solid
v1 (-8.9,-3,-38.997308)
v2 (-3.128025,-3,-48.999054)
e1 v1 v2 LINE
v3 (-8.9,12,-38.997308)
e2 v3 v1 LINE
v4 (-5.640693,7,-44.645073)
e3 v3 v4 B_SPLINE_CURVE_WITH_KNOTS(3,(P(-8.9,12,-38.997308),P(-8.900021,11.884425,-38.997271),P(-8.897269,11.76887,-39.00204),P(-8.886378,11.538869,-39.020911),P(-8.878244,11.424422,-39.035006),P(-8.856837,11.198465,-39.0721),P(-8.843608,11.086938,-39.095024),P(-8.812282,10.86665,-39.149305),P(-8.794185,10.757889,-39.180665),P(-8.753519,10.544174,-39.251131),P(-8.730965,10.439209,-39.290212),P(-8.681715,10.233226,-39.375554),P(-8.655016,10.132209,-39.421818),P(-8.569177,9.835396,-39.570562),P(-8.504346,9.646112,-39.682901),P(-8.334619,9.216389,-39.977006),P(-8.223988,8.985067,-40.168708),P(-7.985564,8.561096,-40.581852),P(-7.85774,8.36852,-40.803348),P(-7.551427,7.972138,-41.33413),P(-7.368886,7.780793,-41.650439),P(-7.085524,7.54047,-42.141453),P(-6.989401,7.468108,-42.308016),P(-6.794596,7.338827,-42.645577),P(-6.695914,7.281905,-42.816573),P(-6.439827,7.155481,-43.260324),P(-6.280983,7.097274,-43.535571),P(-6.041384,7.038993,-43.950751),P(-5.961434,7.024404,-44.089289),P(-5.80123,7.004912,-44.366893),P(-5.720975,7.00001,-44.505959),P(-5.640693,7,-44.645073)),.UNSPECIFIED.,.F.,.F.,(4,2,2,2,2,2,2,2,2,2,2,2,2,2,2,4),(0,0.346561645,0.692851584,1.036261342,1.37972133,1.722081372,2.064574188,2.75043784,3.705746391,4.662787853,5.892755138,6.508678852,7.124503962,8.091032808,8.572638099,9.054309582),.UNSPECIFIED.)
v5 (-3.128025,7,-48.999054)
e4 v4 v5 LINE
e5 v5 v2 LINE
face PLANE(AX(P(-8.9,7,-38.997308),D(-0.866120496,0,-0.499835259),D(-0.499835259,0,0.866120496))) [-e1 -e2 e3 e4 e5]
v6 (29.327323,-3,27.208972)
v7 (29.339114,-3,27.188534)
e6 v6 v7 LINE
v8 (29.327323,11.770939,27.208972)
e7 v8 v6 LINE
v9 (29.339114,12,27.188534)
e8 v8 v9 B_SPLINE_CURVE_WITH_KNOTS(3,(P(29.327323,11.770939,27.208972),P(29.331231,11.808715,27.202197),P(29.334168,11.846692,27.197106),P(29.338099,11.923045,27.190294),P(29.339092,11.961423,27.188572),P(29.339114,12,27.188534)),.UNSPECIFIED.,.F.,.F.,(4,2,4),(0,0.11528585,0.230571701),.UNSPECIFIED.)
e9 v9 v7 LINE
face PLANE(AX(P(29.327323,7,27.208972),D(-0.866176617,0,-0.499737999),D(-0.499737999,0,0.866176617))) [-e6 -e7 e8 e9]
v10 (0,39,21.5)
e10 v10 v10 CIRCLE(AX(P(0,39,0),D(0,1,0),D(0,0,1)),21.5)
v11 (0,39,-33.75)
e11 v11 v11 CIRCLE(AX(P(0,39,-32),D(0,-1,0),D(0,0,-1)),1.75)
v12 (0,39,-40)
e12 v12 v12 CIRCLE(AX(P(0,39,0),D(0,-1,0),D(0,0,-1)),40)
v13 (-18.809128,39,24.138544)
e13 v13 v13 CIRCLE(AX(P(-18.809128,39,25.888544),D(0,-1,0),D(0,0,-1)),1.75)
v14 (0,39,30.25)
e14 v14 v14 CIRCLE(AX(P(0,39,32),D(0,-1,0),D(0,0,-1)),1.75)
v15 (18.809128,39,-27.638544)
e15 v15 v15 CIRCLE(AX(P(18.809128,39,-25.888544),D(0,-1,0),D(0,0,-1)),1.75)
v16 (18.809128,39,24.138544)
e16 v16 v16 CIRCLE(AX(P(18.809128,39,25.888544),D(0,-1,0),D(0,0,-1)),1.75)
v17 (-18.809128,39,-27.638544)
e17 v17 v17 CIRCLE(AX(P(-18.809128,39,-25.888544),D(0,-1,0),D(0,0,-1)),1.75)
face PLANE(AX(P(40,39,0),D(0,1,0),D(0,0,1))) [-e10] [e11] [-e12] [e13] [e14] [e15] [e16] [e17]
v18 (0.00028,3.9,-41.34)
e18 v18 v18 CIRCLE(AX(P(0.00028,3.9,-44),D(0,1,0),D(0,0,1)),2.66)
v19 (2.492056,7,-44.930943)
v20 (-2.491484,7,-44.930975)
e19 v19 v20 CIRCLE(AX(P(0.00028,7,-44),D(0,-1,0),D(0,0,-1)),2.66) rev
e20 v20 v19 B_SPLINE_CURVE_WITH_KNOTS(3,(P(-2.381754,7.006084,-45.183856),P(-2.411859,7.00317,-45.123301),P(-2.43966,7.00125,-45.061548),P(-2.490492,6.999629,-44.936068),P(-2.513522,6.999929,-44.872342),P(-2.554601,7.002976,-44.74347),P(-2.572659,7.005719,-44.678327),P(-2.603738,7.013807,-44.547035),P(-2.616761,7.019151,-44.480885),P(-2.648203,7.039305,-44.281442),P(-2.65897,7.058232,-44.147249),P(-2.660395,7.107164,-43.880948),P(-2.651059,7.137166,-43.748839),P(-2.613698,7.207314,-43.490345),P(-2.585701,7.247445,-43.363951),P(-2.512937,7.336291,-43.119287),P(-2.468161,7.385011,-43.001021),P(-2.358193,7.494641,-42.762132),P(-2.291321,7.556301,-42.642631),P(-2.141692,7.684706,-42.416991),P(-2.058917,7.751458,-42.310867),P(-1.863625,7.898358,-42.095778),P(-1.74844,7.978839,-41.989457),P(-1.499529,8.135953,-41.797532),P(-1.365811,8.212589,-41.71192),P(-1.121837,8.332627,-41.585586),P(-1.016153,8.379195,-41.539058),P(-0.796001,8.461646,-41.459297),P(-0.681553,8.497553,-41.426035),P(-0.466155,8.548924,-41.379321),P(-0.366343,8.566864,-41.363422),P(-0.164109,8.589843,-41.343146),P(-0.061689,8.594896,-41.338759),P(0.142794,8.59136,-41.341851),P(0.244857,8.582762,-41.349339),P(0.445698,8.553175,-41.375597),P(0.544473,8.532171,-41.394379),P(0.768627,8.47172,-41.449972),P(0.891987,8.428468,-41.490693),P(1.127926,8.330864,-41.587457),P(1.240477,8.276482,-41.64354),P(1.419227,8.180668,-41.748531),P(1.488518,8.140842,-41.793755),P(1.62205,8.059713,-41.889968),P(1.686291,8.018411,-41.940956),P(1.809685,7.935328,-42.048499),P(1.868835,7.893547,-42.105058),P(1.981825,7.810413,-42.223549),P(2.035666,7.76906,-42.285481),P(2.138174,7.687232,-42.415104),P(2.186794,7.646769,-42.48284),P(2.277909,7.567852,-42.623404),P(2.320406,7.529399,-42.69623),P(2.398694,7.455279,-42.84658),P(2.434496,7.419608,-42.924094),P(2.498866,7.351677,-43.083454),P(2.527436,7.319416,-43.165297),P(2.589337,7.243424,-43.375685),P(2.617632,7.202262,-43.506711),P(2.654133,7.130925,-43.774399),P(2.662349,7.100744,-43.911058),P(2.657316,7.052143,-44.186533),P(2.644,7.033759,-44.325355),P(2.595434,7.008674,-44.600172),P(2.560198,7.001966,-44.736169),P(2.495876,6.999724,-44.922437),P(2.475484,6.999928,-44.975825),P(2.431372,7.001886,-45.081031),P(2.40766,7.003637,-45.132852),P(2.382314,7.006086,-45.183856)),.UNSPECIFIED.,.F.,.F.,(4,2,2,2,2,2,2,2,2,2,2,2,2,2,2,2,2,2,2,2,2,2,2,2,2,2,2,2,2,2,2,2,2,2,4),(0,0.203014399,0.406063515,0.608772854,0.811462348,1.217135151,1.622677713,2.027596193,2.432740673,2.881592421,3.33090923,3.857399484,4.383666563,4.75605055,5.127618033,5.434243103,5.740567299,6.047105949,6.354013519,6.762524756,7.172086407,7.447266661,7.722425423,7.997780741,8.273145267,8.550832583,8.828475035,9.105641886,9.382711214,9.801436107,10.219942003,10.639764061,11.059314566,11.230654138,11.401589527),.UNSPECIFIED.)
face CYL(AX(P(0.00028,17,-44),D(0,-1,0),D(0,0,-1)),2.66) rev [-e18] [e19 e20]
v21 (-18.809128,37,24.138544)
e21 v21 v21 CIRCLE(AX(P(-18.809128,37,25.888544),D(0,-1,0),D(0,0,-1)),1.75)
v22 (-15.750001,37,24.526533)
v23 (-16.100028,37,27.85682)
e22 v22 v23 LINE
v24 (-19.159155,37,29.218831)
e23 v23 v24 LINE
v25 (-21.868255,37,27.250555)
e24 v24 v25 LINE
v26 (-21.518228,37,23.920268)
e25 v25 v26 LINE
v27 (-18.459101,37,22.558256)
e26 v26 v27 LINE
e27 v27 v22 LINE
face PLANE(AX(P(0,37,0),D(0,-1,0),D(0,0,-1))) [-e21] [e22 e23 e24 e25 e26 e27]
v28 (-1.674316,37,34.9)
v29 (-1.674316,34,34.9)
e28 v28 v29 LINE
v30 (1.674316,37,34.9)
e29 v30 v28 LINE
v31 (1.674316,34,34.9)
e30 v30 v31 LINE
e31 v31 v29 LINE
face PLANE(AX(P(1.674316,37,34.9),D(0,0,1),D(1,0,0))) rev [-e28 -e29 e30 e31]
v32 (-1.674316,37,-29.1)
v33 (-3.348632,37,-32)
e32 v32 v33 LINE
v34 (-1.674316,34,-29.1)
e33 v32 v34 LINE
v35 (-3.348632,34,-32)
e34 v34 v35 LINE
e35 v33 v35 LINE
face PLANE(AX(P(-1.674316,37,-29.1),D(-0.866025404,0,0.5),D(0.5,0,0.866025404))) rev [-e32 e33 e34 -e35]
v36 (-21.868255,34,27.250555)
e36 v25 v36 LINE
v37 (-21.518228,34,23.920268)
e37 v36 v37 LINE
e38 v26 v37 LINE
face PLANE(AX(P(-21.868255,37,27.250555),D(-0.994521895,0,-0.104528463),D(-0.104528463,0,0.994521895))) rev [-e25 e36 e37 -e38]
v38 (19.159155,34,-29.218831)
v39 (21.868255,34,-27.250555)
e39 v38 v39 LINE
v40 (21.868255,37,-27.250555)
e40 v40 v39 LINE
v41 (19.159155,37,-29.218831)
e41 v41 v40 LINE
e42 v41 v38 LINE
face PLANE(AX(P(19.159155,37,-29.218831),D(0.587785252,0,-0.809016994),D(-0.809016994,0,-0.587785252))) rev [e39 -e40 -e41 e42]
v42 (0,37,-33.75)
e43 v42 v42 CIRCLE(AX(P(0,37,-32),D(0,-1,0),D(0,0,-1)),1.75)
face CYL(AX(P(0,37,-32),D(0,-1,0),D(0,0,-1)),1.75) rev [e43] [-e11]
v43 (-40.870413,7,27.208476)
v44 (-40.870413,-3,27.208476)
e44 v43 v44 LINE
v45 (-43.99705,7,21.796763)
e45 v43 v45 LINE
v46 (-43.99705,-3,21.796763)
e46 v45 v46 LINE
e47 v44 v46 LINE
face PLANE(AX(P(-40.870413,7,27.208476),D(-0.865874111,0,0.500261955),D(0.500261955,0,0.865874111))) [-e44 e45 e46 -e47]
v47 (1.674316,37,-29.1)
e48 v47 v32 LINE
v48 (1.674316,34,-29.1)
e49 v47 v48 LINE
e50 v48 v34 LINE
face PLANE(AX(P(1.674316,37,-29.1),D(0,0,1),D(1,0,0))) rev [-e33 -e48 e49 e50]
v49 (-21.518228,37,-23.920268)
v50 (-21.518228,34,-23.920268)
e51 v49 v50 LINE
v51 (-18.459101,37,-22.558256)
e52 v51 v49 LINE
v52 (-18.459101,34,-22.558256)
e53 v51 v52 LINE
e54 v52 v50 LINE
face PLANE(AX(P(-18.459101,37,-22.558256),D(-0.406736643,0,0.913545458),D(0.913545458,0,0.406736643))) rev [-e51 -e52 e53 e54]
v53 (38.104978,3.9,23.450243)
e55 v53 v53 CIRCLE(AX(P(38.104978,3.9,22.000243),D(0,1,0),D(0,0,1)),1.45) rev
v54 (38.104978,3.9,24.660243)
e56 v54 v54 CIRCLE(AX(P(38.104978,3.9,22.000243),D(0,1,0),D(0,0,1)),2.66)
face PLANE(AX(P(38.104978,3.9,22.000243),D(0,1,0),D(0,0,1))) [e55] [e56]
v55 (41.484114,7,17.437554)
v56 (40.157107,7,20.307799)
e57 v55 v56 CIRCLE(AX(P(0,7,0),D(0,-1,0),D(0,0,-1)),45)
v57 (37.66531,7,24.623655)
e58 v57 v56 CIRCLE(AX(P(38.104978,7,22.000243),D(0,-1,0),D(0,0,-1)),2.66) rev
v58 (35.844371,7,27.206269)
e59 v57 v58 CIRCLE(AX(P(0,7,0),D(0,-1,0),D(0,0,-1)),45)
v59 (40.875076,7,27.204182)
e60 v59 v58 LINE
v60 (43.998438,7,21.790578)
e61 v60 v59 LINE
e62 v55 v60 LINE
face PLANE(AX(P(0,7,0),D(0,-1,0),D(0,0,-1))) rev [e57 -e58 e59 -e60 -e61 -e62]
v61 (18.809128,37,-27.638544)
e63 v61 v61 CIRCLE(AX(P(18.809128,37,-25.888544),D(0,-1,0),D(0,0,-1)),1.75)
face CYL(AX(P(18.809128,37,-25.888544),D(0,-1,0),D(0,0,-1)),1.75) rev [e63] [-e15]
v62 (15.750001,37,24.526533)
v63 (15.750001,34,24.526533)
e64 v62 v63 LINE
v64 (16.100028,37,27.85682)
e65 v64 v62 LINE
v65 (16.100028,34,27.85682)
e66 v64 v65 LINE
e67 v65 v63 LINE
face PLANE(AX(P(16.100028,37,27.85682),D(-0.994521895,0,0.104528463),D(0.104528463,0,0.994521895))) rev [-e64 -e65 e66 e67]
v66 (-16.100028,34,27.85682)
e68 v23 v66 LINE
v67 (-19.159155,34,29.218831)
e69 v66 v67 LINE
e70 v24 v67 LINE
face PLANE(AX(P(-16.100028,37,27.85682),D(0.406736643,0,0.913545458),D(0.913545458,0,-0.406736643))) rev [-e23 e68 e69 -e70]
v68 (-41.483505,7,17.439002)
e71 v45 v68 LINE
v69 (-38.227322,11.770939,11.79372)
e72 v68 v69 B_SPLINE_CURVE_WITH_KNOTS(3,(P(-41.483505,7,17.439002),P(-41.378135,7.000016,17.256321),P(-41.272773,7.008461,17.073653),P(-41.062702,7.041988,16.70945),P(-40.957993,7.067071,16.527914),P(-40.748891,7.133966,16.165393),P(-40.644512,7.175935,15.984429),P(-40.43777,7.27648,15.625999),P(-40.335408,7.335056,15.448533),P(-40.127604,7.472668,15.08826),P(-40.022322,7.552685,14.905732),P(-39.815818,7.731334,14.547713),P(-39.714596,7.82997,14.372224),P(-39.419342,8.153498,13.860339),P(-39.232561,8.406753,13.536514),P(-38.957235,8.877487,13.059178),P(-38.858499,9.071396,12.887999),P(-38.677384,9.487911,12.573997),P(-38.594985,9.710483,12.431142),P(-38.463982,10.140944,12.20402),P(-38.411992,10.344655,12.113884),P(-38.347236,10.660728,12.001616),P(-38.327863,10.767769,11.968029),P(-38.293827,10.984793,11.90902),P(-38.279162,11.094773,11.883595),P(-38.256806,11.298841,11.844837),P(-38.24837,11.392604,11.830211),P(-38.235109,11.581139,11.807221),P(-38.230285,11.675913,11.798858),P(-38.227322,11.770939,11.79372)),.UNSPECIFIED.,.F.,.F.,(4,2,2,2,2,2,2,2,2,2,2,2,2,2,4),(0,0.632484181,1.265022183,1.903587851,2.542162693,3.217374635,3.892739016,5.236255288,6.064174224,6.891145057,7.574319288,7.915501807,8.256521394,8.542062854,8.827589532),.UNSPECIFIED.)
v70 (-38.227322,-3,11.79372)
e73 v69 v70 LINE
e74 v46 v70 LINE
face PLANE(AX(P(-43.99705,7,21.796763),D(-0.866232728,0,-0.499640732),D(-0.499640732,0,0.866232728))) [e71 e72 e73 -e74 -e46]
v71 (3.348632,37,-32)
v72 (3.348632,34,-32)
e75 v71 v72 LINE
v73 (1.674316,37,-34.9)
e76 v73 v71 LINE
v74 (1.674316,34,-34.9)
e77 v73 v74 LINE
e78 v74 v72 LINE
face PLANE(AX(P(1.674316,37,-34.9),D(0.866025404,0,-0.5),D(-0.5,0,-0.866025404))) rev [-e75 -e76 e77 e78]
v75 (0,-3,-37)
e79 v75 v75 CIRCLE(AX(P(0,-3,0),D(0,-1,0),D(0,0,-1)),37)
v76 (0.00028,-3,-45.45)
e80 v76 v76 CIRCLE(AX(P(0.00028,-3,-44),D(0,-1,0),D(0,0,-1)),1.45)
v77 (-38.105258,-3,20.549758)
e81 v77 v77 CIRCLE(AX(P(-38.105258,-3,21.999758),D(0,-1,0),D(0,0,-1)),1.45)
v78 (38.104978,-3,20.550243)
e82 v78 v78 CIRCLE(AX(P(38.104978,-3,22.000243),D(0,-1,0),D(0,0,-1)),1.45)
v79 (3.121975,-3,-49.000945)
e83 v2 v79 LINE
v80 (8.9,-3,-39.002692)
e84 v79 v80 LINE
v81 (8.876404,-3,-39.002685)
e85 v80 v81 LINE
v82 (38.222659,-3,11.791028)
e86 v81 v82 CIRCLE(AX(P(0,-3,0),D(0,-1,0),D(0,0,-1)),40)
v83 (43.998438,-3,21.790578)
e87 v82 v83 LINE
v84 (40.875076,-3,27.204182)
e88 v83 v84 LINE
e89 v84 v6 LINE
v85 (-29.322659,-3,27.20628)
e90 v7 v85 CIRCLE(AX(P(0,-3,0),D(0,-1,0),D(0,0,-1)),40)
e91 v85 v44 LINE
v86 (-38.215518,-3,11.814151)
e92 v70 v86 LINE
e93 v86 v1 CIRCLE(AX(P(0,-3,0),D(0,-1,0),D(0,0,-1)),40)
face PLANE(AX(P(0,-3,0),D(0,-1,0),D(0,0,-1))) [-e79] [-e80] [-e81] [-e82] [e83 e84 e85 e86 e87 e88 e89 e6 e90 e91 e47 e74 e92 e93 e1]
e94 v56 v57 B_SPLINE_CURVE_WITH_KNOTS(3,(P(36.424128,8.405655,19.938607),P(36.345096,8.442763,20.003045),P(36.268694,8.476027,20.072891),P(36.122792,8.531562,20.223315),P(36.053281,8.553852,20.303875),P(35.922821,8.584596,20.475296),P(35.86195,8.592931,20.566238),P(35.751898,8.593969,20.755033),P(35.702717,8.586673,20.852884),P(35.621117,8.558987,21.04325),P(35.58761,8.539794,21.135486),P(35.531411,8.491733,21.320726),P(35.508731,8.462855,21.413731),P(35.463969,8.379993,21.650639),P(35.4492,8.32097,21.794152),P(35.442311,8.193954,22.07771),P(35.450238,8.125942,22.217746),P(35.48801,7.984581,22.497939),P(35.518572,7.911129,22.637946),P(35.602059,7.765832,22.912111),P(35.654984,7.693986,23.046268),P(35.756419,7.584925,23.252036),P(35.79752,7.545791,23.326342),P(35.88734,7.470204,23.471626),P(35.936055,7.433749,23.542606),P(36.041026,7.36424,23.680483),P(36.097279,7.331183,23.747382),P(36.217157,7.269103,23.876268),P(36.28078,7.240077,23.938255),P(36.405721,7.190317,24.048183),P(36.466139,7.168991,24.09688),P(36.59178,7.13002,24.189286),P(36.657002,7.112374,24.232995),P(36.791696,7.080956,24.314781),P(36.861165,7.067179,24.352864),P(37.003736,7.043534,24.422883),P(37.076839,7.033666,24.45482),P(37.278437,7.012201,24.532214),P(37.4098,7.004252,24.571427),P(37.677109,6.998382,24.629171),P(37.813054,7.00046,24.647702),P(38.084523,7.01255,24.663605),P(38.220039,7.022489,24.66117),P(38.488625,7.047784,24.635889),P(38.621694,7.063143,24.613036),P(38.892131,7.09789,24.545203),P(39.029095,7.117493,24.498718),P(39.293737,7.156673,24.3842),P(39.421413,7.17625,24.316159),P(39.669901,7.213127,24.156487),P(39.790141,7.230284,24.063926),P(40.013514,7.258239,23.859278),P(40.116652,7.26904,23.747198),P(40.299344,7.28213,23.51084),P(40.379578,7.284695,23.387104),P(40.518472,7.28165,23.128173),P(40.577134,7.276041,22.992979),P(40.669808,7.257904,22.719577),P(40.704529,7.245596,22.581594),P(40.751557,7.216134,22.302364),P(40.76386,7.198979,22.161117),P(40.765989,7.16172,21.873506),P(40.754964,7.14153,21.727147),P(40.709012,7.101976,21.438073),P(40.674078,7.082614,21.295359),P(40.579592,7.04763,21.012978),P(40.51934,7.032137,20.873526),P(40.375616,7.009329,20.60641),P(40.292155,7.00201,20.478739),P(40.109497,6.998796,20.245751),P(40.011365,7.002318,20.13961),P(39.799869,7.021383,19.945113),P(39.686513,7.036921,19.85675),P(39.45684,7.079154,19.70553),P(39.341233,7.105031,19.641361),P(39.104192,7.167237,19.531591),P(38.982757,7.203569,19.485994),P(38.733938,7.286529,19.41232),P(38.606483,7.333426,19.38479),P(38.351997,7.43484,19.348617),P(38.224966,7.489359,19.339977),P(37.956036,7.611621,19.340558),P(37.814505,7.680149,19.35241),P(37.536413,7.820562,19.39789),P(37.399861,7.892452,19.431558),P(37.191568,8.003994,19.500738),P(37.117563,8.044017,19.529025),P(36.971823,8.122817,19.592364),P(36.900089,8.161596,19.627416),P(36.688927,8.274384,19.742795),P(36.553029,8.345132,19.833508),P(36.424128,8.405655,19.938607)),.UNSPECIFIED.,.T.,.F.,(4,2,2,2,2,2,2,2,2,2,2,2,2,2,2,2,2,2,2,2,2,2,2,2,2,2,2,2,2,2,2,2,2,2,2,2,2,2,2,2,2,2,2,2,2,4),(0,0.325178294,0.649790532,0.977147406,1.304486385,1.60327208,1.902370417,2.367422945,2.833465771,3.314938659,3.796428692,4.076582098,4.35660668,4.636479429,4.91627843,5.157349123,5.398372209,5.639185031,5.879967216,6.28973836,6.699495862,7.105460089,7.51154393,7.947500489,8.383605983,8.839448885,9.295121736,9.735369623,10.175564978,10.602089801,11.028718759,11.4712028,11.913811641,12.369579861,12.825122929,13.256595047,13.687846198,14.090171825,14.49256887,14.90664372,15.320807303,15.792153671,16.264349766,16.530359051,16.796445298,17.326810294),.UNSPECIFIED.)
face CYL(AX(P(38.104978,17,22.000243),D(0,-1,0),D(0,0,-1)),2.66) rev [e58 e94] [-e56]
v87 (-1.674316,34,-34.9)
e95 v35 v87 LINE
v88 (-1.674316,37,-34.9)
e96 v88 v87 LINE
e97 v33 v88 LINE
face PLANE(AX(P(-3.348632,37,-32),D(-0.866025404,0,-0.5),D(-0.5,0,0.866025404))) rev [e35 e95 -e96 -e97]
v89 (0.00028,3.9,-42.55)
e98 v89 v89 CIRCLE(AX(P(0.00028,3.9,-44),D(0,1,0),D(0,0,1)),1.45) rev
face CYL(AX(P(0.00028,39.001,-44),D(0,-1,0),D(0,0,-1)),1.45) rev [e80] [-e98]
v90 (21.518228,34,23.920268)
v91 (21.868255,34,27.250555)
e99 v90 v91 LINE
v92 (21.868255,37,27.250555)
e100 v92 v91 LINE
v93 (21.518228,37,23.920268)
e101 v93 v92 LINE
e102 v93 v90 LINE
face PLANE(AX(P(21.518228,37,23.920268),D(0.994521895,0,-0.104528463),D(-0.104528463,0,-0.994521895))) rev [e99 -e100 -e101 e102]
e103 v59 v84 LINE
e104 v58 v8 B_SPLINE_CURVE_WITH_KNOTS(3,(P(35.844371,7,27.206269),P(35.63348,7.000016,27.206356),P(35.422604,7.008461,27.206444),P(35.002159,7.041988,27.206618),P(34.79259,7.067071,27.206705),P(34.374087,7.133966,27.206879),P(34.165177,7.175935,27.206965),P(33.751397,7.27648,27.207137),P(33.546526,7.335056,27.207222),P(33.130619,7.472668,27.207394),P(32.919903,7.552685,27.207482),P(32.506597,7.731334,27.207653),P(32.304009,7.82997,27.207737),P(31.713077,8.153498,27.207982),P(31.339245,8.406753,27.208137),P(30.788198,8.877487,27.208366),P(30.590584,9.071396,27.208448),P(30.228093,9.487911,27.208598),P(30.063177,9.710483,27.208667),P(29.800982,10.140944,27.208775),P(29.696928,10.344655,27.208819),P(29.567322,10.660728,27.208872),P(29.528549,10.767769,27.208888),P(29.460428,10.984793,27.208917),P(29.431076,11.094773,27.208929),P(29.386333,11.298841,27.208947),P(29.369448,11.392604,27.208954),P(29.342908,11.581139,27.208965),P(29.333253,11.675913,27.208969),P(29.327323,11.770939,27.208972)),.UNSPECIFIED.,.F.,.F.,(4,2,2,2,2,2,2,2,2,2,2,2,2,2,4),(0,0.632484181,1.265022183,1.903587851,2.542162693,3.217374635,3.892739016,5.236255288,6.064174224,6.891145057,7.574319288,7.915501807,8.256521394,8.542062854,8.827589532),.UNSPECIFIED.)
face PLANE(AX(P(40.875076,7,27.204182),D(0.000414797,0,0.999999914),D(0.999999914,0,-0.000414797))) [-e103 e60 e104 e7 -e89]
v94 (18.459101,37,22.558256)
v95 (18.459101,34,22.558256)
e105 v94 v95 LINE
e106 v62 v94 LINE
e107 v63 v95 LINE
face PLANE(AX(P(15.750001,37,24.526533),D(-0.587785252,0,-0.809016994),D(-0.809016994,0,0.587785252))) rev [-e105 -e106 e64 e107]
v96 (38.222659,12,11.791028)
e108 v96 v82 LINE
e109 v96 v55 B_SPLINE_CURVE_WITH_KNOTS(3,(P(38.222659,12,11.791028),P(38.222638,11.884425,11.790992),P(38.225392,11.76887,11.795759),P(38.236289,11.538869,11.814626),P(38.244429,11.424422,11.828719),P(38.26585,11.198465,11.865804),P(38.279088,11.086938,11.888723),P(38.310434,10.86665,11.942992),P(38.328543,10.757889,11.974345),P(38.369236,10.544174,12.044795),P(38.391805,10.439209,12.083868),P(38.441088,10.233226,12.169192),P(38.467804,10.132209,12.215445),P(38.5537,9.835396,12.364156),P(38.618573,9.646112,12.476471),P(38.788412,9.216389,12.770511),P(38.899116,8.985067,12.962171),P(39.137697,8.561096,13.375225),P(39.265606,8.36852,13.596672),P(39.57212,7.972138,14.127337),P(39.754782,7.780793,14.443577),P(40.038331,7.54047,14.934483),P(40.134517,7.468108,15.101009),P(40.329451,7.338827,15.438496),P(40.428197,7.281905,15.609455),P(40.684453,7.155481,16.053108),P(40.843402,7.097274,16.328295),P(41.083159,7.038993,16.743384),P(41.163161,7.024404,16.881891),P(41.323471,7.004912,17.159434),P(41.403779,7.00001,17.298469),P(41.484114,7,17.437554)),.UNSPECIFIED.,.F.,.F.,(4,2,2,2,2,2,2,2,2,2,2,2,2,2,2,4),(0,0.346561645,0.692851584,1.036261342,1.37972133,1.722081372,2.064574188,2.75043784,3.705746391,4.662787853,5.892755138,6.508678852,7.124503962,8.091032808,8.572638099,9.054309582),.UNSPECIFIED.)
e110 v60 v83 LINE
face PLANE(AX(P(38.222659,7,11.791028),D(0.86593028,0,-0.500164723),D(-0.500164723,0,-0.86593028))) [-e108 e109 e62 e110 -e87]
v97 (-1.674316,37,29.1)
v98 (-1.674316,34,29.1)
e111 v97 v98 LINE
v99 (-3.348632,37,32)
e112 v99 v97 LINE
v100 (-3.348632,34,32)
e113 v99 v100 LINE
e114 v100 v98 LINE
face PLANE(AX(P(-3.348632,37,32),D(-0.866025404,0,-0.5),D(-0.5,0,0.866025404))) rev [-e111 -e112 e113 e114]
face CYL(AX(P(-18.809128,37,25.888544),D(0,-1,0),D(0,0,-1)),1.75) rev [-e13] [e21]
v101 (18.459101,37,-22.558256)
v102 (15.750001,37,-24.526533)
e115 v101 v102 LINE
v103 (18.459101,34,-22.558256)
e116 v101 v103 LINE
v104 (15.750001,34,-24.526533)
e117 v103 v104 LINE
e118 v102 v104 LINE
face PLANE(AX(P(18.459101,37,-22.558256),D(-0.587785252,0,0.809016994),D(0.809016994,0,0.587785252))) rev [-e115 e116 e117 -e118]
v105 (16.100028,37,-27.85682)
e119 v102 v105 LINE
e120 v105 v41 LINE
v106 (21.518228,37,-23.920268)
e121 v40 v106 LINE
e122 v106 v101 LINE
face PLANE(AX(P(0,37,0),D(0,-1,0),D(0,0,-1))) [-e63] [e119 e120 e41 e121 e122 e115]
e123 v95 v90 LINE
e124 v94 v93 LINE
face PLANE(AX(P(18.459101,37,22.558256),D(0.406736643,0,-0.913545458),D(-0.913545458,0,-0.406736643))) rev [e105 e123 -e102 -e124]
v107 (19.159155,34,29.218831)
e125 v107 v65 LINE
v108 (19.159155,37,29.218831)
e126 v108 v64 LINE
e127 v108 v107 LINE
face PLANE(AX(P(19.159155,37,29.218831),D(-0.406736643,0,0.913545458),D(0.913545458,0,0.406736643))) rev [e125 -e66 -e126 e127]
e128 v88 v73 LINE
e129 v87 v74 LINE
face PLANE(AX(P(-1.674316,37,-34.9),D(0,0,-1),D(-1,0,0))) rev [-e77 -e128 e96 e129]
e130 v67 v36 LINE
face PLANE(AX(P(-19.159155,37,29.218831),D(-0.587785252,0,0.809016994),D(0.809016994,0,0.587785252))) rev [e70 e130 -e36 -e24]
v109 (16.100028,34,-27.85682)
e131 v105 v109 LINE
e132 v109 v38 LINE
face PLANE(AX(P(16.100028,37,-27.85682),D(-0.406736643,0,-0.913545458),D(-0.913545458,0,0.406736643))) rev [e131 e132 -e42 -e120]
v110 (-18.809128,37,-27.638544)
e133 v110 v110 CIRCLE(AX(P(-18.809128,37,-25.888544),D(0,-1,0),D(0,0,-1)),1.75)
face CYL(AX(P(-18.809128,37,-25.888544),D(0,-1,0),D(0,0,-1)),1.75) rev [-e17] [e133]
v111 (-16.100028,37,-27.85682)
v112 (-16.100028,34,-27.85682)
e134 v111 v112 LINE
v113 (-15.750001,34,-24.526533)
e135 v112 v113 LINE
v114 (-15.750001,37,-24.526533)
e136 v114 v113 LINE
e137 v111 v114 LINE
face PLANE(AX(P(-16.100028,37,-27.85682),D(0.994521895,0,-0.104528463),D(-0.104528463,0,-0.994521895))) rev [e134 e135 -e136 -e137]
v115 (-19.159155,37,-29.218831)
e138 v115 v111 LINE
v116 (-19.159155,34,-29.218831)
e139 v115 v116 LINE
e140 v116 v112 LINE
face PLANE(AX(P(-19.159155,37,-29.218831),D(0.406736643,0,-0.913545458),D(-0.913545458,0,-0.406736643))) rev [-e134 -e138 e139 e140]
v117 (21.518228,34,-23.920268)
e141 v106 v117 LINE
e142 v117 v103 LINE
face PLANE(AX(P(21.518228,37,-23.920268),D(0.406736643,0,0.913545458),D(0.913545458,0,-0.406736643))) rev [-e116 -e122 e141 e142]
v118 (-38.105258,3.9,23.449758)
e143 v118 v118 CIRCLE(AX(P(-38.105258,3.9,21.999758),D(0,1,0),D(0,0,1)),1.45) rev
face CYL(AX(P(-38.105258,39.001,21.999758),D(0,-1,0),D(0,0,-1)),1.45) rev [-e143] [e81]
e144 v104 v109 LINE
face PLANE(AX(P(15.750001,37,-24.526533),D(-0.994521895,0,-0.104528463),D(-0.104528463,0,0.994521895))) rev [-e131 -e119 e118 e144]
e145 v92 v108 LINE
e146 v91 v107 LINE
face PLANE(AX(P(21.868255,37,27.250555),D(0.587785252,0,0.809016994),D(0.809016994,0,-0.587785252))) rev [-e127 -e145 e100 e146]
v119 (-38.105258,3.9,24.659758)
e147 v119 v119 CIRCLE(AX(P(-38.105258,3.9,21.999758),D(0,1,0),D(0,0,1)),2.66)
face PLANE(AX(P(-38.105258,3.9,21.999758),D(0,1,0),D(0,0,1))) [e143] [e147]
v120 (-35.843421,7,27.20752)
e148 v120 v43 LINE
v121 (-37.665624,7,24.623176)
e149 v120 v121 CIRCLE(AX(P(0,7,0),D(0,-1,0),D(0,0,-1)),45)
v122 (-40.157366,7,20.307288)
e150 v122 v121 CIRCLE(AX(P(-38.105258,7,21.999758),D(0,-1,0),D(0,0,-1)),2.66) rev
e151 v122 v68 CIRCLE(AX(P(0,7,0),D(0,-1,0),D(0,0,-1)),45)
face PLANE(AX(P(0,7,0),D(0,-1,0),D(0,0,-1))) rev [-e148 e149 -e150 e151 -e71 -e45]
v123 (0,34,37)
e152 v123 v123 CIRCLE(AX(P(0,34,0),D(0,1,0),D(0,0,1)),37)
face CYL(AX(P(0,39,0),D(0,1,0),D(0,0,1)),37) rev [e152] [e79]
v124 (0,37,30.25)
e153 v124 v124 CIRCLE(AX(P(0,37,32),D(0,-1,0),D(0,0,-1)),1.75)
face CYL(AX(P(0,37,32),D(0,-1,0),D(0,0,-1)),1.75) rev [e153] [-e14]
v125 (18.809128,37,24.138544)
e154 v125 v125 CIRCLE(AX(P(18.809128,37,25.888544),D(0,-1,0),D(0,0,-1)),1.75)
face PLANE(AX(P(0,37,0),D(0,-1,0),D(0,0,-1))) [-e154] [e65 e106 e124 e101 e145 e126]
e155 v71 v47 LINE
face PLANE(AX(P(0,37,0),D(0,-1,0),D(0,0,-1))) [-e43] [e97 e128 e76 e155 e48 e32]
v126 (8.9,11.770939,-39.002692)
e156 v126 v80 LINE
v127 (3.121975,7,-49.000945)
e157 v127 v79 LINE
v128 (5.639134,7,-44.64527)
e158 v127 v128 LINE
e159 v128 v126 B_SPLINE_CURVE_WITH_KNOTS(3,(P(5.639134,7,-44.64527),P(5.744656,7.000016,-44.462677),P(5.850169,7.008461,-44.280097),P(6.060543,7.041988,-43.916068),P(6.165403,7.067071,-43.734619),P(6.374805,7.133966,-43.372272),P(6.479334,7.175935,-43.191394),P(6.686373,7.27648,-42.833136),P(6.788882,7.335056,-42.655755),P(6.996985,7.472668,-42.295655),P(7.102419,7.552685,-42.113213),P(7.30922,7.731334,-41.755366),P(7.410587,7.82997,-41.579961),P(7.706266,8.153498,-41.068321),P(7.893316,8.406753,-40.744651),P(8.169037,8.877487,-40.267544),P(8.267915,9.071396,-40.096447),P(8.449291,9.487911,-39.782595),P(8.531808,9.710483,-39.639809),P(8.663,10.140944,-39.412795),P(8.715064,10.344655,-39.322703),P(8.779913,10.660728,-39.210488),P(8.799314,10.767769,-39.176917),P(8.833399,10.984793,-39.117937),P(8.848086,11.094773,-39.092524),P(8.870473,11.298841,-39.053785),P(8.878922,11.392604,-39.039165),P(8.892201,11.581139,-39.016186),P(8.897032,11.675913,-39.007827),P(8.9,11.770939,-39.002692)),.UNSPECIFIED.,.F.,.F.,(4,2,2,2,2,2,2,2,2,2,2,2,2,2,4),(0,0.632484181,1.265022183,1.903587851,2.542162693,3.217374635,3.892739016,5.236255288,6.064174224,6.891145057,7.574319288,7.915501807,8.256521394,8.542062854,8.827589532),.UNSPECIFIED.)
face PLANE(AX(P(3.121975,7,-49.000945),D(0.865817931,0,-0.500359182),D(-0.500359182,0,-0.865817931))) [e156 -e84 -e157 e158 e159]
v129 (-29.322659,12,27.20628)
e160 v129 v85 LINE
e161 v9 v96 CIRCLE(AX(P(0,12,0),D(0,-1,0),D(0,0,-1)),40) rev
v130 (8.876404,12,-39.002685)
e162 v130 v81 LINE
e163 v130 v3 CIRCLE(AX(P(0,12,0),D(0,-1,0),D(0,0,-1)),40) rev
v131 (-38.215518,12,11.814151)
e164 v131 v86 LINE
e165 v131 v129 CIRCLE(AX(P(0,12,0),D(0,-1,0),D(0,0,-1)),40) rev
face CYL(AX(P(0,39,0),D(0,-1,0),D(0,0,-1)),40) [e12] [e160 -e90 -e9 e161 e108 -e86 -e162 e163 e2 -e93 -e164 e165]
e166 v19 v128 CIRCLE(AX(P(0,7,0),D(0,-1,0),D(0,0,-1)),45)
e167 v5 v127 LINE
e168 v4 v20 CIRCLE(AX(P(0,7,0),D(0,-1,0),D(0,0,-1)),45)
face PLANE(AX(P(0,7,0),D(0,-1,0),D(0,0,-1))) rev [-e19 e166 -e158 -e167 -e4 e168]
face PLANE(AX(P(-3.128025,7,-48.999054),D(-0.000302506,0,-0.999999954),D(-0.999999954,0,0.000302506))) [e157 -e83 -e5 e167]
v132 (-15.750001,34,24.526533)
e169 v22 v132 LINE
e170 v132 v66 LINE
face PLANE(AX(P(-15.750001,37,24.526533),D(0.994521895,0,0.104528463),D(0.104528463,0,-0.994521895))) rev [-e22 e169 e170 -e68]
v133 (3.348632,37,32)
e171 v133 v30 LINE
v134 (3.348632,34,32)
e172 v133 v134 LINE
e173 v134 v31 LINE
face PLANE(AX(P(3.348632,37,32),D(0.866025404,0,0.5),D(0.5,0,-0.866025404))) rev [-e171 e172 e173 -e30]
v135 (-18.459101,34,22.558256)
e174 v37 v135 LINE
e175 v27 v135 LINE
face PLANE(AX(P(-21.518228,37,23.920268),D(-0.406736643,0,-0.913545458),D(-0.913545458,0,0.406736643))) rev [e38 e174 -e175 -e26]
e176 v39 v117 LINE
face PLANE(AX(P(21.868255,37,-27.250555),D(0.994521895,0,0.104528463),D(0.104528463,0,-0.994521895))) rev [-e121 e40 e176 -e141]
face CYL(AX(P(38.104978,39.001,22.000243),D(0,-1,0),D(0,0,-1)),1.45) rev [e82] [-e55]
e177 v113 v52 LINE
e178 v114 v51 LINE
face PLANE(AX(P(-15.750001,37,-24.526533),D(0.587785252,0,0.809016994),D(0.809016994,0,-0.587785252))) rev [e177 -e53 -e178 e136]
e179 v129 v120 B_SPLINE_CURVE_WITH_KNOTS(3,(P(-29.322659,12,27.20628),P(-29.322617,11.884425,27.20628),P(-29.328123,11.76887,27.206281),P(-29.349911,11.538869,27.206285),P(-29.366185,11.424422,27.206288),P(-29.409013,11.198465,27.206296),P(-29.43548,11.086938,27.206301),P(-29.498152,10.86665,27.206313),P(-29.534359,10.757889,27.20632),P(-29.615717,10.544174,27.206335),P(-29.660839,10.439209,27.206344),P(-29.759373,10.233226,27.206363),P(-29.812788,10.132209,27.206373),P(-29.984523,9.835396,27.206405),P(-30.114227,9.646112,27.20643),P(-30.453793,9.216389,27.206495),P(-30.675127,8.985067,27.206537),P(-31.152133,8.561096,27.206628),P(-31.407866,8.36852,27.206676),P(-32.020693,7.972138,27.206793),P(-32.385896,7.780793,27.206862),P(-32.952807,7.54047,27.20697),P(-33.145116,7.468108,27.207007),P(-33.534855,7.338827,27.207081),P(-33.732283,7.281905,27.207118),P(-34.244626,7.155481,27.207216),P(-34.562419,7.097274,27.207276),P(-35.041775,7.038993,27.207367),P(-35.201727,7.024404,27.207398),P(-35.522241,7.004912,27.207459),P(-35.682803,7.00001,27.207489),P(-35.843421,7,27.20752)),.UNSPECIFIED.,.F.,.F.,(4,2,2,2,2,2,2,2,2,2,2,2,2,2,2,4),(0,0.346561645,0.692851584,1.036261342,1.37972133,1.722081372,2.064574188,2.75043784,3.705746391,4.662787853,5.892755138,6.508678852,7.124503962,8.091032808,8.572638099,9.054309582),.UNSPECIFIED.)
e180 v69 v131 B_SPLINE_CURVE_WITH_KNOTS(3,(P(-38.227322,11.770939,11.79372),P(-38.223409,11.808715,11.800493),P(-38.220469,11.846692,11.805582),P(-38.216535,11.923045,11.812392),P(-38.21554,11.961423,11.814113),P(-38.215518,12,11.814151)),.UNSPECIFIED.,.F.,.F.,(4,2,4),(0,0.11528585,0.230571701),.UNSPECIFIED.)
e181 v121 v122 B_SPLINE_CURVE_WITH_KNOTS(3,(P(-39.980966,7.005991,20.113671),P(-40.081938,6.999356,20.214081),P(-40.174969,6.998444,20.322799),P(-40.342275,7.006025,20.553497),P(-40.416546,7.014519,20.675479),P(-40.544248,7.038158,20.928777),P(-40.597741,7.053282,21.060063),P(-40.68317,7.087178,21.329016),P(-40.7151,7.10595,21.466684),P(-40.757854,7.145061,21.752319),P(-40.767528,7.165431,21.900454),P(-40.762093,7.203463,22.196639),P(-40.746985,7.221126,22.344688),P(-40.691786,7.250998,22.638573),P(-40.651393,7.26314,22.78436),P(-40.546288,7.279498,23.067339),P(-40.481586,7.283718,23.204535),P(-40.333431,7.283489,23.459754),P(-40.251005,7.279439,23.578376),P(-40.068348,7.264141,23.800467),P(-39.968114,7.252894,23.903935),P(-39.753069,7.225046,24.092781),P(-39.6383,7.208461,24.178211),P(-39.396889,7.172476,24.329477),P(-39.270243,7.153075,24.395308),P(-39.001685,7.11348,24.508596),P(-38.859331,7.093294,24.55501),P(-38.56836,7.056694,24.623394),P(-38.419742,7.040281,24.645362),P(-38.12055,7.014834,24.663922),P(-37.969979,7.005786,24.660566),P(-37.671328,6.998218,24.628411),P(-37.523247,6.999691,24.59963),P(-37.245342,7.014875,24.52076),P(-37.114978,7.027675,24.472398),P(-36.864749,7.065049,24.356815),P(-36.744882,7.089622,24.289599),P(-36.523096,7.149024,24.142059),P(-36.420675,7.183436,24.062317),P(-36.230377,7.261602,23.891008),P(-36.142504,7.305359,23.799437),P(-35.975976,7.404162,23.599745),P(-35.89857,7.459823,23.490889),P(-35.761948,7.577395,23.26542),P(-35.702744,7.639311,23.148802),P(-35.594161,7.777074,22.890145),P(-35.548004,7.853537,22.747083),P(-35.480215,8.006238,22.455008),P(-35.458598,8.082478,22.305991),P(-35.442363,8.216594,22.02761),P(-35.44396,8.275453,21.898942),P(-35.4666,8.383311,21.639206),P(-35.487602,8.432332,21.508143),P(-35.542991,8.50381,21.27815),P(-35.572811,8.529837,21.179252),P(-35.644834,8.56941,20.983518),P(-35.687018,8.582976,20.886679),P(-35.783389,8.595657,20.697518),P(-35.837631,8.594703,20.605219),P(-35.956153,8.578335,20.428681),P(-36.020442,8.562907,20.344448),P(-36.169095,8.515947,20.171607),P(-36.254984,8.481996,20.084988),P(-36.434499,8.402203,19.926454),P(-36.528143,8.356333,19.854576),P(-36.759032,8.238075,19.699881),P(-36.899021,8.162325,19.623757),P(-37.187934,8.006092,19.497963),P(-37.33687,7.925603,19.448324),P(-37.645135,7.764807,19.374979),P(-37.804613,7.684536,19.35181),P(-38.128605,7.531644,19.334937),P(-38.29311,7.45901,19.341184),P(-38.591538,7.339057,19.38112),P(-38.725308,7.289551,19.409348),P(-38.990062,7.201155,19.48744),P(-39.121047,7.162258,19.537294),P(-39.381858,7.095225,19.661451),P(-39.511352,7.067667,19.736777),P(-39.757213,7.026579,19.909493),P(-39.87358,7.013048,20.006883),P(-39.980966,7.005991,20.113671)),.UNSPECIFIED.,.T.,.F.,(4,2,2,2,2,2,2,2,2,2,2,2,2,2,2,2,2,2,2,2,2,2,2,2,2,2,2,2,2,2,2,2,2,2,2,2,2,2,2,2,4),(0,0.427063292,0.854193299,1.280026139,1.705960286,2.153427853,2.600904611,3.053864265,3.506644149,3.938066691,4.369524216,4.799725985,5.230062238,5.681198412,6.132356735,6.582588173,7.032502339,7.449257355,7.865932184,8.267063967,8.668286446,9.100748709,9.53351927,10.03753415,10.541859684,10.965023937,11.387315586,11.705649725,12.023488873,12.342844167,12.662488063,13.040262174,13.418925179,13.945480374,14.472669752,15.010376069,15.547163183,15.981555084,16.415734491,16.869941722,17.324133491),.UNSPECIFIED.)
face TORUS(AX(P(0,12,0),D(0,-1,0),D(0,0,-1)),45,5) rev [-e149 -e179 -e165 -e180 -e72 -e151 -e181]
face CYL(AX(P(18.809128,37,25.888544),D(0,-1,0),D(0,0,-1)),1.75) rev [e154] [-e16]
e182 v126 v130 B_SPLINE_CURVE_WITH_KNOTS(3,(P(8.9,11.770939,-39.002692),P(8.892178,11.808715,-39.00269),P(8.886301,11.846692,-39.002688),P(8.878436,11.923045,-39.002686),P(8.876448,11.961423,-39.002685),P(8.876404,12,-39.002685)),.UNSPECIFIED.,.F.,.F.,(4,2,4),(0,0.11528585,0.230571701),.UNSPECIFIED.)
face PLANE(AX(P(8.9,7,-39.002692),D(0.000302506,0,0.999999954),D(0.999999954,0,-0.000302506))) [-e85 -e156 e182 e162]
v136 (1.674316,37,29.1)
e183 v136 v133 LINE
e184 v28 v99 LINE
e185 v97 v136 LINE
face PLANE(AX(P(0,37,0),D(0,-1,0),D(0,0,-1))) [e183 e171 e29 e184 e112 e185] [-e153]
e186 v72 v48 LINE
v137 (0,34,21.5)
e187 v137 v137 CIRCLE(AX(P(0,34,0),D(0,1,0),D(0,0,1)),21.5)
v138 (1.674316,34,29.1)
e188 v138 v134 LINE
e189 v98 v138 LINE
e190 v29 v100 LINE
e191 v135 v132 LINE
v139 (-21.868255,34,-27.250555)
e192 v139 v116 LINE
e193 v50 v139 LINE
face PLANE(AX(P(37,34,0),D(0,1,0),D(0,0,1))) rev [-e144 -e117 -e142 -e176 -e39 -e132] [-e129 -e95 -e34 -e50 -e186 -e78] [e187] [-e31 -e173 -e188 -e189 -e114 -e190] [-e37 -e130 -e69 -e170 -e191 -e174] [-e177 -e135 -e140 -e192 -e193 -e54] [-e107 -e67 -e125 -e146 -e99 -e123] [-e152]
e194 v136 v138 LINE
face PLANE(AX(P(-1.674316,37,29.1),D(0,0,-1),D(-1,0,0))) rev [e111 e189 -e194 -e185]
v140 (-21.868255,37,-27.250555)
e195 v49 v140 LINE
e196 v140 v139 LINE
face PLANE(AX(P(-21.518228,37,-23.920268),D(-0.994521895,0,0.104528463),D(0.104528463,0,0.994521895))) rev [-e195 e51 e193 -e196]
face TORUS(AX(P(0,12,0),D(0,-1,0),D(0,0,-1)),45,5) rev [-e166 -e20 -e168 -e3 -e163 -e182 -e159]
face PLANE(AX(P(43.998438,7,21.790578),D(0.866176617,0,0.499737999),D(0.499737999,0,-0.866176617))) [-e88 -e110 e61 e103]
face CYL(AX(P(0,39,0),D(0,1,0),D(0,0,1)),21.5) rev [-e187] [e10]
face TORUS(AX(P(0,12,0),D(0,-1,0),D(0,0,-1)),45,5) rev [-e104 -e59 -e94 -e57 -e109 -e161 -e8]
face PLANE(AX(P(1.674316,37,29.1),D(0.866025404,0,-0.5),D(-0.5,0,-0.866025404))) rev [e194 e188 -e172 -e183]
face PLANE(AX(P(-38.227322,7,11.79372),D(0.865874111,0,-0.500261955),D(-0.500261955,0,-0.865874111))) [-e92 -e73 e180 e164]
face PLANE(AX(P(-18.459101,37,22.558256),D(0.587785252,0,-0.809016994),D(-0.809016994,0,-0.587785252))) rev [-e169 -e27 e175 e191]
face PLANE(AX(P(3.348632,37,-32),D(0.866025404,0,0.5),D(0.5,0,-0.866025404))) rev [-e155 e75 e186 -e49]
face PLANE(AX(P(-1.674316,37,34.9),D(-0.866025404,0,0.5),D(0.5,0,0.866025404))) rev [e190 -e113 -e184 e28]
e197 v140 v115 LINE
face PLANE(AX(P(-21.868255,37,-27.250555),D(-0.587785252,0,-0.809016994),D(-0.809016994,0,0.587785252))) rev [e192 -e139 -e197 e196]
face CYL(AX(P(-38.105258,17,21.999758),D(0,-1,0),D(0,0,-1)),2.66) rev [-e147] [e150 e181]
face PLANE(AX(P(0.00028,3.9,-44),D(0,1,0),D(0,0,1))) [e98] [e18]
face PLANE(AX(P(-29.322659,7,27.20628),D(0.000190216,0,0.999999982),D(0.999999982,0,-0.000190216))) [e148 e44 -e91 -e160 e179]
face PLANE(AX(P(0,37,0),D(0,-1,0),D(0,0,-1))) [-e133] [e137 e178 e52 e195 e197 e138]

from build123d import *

# Parameters (mm, degrees)
SKETCH_1_W               = 40
SKETCH_1_H               = 39
CUT_EXTRUDE_1_DEPTH      = 3
CUT_EXTRUDE_2_DEPTH      = 3
CUT_EXTRUDE_3_DEPTH      = 3
CUT_EXTRUDE_4_DEPTH      = 3
CUT_EXTRUDE_5_DEPTH      = 3
CUT_EXTRUDE_6_DEPTH      = 3
HOLE_WIZARD_3_5_3_5_1_D  = 3.5
SKETCH_14_R              = 40
SKETCH_14_R_2            = 37
EXTRUDE_1_DEPTH          = 3
EXTRUDE_2_DEPTH          = 10
FILLET_1_R               = 5
FILLET_2_R               = 5
CUT_EXTRUDE_8_REACH      = 80.109
SKETCH_20_R              = 1.45
CUT_EXTRUDE_9_DEPTH      = 10
CUT_EXTRUDE_9_DEPTH_BACK = 3.1
SKETCH_21_R              = 3.121637526
SKETCH_21_R_2            = 2.750833309
SKETCH_21_R_3            = 2.66


with BuildPart() as part:
    # 草图1 → 旋转1 (revolve)
    with BuildSketch(Plane.XY, mode=Mode.PRIVATE) as revolve_1_sk:
        with Locations((20, 19.5)):
            Rectangle(SKETCH_1_W, SKETCH_1_H)
    revolve(revolve_1_sk.sketch.rotate(Axis((0, 39, 0), (0, -1, 0)), 270), axis=Axis((0, 39, 0), (0, -1, 0)))

    # 草图2 → M64 六角头螺栓的柱形沉头孔1 (revolve, cut)
    with BuildSketch(Plane(origin=(0, 39, 0), x_dir=(0, 0, 1), z_dir=(1, 0, 0))):
        Polygon((0, 0), (0, 39), (37, 39), (37, 5), (21.5, 5), (21.5, 0), align=None)
    revolve(axis=Axis((0, 45.35, 0), (0, -1, 0)), mode=Mode.SUBTRACT)

    # 草图4 → 切除-拉伸1 (cut)
    with BuildSketch(Plane.XZ.offset(-34)):
        Polygon((16.100028232, 27.856820067), (15.750000921, 24.52653266), (18.459100762, 22.558256413), (21.518227914, 23.920267573), (21.868255226, 27.25055498), (19.159155385, 29.218831227), align=None)
    extrude(amount=-CUT_EXTRUDE_1_DEPTH, mode=Mode.SUBTRACT)

    # 草图5 → 切除-拉伸2 (cut)
    with BuildSketch(Plane.XZ.offset(-34)):
        Polygon((-21.868255226, 27.25055498), (-21.518227914, 23.920267573), (-18.459100762, 22.558256413), (-15.750000921, 24.52653266), (-16.100028232, 27.856820067), (-19.159155385, 29.218831227), align=None)
    extrude(amount=-CUT_EXTRUDE_2_DEPTH, mode=Mode.SUBTRACT)

    # 草图6 → 切除-拉伸3 (cut)
    with BuildSketch(Plane.XZ.offset(-34)):
        Polygon((-18.459100762, -22.558256413), (-21.518227914, -23.920267573), (-21.868255226, -27.25055498), (-19.159155385, -29.218831227), (-16.100028232, -27.856820067), (-15.750000921, -24.52653266), align=None)
    extrude(amount=-CUT_EXTRUDE_3_DEPTH, mode=Mode.SUBTRACT)

    # 草图7 → 切除-拉伸4 (cut)
    with BuildSketch(Plane.XZ.offset(-34)):
        Polygon((1.674315781, -29.1), (-1.674315781, -29.1), (-3.348631561, -32), (-1.674315781, -34.9), (1.674315781, -34.9), (3.348631561, -32), align=None)
    extrude(amount=-CUT_EXTRUDE_4_DEPTH, mode=Mode.SUBTRACT)

    # 草图8 → 切除-拉伸5 (cut)
    with BuildSketch(Plane.XZ.offset(-34)):
        Polygon((21.868255226, -27.25055498), (21.518227914, -23.920267573), (18.459100762, -22.558256413), (15.750000921, -24.52653266), (16.100028232, -27.856820067), (19.159155385, -29.218831227), align=None)
    extrude(amount=-CUT_EXTRUDE_5_DEPTH, mode=Mode.SUBTRACT)

    # 草图9 → 切除-拉伸6 (cut)
    with BuildSketch(Plane.XZ.offset(-34)):
        Polygon((-3.348631561, 32), (-1.674315781, 29.1), (1.674315781, 29.1), (3.348631561, 32), (1.674315781, 34.9), (-1.674315781, 34.9), align=None)
    extrude(amount=-CUT_EXTRUDE_6_DEPTH, mode=Mode.SUBTRACT)

    # Ø3.5 (3.5) 直径孔1 (through all)
    with Locations(Plane(origin=(0, 37, 0), x_dir=(-1, 0, 0), z_dir=(0, -1, 0))):
        with Locations((18.809128073, 25.88854382), (-18.809128073, 25.88854382), (0, 32), (18.809128073, -25.88854382), (-18.809128073, -25.88854382), (0, -32)):
            Hole(HOLE_WIZARD_3_5_3_5_1_D / 2)

    # 草图14 → 凸台-拉伸1 (add)
    with BuildSketch(Plane.XZ):
        with Locations(Location((0, 0, 0), (0, 0, 270))):
            Circle(SKETCH_14_R)
        with Locations(Location((0, 0, 0), (0, 0, 90))):
            Circle(SKETCH_14_R_2, mode=Mode.SUBTRACT)
    extrude(amount=EXTRUDE_1_DEPTH)

    # 草图15 → 凸台-拉伸2 (add)
    with BuildSketch(Plane.XZ.offset(3)):
        Polygon((29.327322558, 27.208971895), (38.222658937, 11.791028105), (43.998438168, 21.790578059), (40.875075675, 27.204181918), align=None)
        Polygon((8.899999593, -39.002692308), (-8.899999593, -38.997307692), (-3.128024922, -48.99905421), (3.121974792, -49.000944875), align=None)
        Polygon((-38.227322151, 11.793720413), (-29.322659344, 27.206279587), (-40.870413246, 27.208476151), (-43.997050467, 21.796762958), align=None)
    extrude(amount=-EXTRUDE_2_DEPTH)

    # 圆角1
    # the kernel refuses this fillet: 5 mm, written as the material it adds along each edge
    with BuildSketch(Plane(origin=(0, 7, 0), x_dir=(0, 0, -1), z_dir=(1, 0, 0))) as fillet_1_piece_1_section:
        with BuildLine():
            CenterArc((40 + FILLET_1_R, FILLET_1_R), FILLET_1_R, 180, 90)
            Line((40 + FILLET_1_R, 0), (40, 0))
            Line((40, 0), (40, FILLET_1_R))
        make_face()
    fillet_1_piece_1 = revolve(axis=Axis((0, 7, 0), (0, 1, 0)), revolution_arc=30.760989805, mode=Mode.PRIVATE)
    fillet_1_piece_1 = split(fillet_1_piece_1, bisect_by=Plane(origin=(-6.938848229, 8.159603728, -42.395614154), z_dir=(0.866120495946599, 0, 0.4998352593617396)), keep=Keep.TOP, mode=Mode.PRIVATE)
    add(fillet_1_piece_1)
    with BuildSketch(Plane(origin=(0, 7, 0), x_dir=(0.510937919824611, 0, -0.8596176138756695), z_dir=(0.8596176138756695, 0, 0.510937919824611))) as fillet_1_piece_2_section:
        with BuildLine():
            CenterArc((40 + FILLET_1_R, FILLET_1_R), FILLET_1_R, 180, 90)
            Line((40 + FILLET_1_R, 0), (40, 0))
            Line((40, 0), (40, FILLET_1_R))
        make_face()
    fillet_1_piece_2 = revolve(axis=Axis((0, 7, 0), (0, 1, 0)), revolution_arc=30.726324325, mode=Mode.PRIVATE)
    fillet_1_piece_2 = split(fillet_1_piece_2, bisect_by=Plane(origin=(4.116270695, 8.159650312, -39.001245199), z_dir=(-0.0003025064822812723, 0, -0.9999999542449131)), keep=Keep.TOP, mode=Mode.PRIVATE)
    fillet_1_piece_2 = split(fillet_1_piece_2, bisect_by=Plane(origin=(6.938556974, 8.159650312, -42.396758511), z_dir=(-0.865817930630708, 0, 0.500359181986659)), keep=Keep.TOP, mode=Mode.PRIVATE)
    add(fillet_1_piece_2)

    # 圆角2
    # the kernel refuses this fillet: 5 mm, written as the material it adds along each edge
    with BuildSketch(Plane(origin=(0, 7, 0), x_dir=(-0.9999195538304662, 0, -0.01268407929183255), z_dir=(0.01268407929183255, 0, -0.9999195538304662))) as fillet_2_piece_1_section:
        with BuildLine():
            CenterArc((40 + FILLET_2_R, FILLET_2_R), FILLET_2_R, 180, 90)
            Line((40, FILLET_2_R), (40, 0))
            Line((40, 0), (40 + FILLET_2_R, 0))
        make_face()
    fillet_2_piece_1 = revolve(axis=Axis((0, 7, 0), (0, 1, 0)), revolution_arc=61.488192088, mode=Mode.PRIVATE)
    fillet_2_piece_1 = split(fillet_2_piece_1, bisect_by=Plane(origin=(-33.775857592, 8.159626542, 19.49849963), z_dir=(-0.8658741109182307, 0, 0.5002619554209213)), keep=Keep.TOP, mode=Mode.PRIVATE)
    fillet_2_piece_1 = split(fillet_2_piece_1, bisect_by=Plane(origin=(-41.214638413, 8.159626542, 16.972864045), z_dir=(0.8662327279326016, 0, 0.4996407319849368)), keep=Keep.TOP, mode=Mode.PRIVATE)
    fillet_2_piece_1 = split(fillet_2_piece_1, bisect_by=Plane(origin=(-35.303320955, 8.159626542, 27.207417203), z_dir=(-0.00019021565884901444, 0, -0.9999999819090014)), keep=Keep.TOP, mode=Mode.PRIVATE)
    add(fillet_2_piece_1)
    with BuildSketch(Plane(origin=(0, 7, 0), x_dir=(0.4889750420250284, 0, 0.8722977750038238), z_dir=(-0.8722977750038238, 0, 0.4889750420250284))) as fillet_2_piece_2_section:
        with BuildLine():
            CenterArc((40 + FILLET_2_R, FILLET_2_R), FILLET_2_R, 180, 90)
            Line((40, FILLET_2_R), (40, 0))
            Line((40, 0), (40 + FILLET_2_R, 0))
        make_face()
    fillet_2_piece_2 = revolve(axis=Axis((0, 7, 0), (0, 1, 0)), revolution_arc=61.488192088, mode=Mode.PRIVATE)
    fillet_2_piece_2 = split(fillet_2_piece_2, bisect_by=Plane(origin=(33.774124811, 8.159626542, 19.501500894), z_dir=(0.8661766174005117, 0, 0.49973799882399134)), keep=Keep.TOP, mode=Mode.PRIVATE)
    fillet_2_piece_2 = split(fillet_2_piece_2, bisect_by=Plane(origin=(35.306250644, 8.159626542, 27.206491851), z_dir=(-0.0004147973018910844, 0, -0.9999999139715955)), keep=Keep.TOP, mode=Mode.PRIVATE)
    fillet_2_piece_2 = split(fillet_2_piece_2, bisect_by=Plane(origin=(41.213974946, 8.159626542, 16.969864183), z_dir=(-0.8659302802877497, 0, 0.5001647225472617)), keep=Keep.TOP, mode=Mode.PRIVATE)
    add(fillet_2_piece_2)

    # 草图20 → 切除-拉伸8 (cut, up to next)
    with BuildSketch(Plane.XZ.offset(3), mode=Mode.PRIVATE) as cut_extrude_8_sk1:
        with Locations(Location((0.000280142, -44.000000314, 0), (0, 0, 270))):
            Circle(SKETCH_20_R)
    cut_extrude_8_tool1 = extrude(cut_extrude_8_sk1.sketch, amount=-CUT_EXTRUDE_8_REACH, mode=Mode.PRIVATE) & part.part
    # 草图20 → 切除-拉伸8 (cut, up to next)
    with BuildSketch(Plane.XZ.offset(3), mode=Mode.PRIVATE) as cut_extrude_8_sk2:
        with Locations(Location((-38.105258109, 21.999757547, 0), (0, 0, 270))):
            Circle(SKETCH_20_R)
    cut_extrude_8_tool2 = extrude(cut_extrude_8_sk2.sketch, amount=-CUT_EXTRUDE_8_REACH, mode=Mode.PRIVATE) & part.part
    # 草图20 → 切除-拉伸8 (cut, up to next)
    with BuildSketch(Plane.XZ.offset(3), mode=Mode.PRIVATE) as cut_extrude_8_sk3:
        with Locations(Location((38.104977967, 22.000242767, 0), (0, 0, 270))):
            Circle(SKETCH_20_R)
    cut_extrude_8_tool3 = extrude(cut_extrude_8_sk3.sketch, amount=-CUT_EXTRUDE_8_REACH, mode=Mode.PRIVATE) & part.part
    add(cut_extrude_8_tool1.solids().sort_by_distance((0.00028, -3, -44))[0], mode=Mode.SUBTRACT)
    add(cut_extrude_8_tool2.solids().sort_by_distance((-38.105258, -3, 21.999758))[0], mode=Mode.SUBTRACT)
    add(cut_extrude_8_tool3.solids().sort_by_distance((38.104978, -3, 22.000243))[0], mode=Mode.SUBTRACT)

    # 草图21 → 切除-拉伸9 (cut, two sides: drawn at the far end of the back side and taken through both)
    # profile 1 of 4: a face of its own
    with BuildSketch(Plane(origin=(0, 7, 0), x_dir=(1, 0, 0), z_dir=(0, 1, 0)).offset(-CUT_EXTRUDE_9_DEPTH_BACK)):
        Circle(SKETCH_21_R)
        Circle(SKETCH_21_R_2, mode=Mode.SUBTRACT)
    # profile 2 of 4: a face of its own
    with BuildSketch(Plane(origin=(0, 7, 0), x_dir=(1, 0, 0), z_dir=(0, 1, 0)).offset(-CUT_EXTRUDE_9_DEPTH_BACK)):
        with Locations(Location((0.000280142, 44.000000314, 0), (0, 0, 159.513268141))):
            Circle(SKETCH_21_R_3)
    # profile 3 of 4: a face of its own
    with BuildSketch(Plane(origin=(0, 7, 0), x_dir=(1, 0, 0), z_dir=(0, 1, 0)).offset(-CUT_EXTRUDE_9_DEPTH_BACK)):
        with Locations(Location((38.104977967, -22.000242767, 0), (0, 0, 39.513268136))):
            Circle(SKETCH_21_R_3)
    # profile 4 of 4: a face of its own
    with BuildSketch(Plane(origin=(0, 7, 0), x_dir=(1, 0, 0), z_dir=(0, 1, 0)).offset(-CUT_EXTRUDE_9_DEPTH_BACK)):
        with Locations(Location((-38.105258109, -21.999757547, 0), (0, 0, 140.486002271))):
            Circle(SKETCH_21_R_3)
    extrude(amount=CUT_EXTRUDE_9_DEPTH + CUT_EXTRUDE_9_DEPTH_BACK, mode=Mode.SUBTRACT)


solid = part.part
